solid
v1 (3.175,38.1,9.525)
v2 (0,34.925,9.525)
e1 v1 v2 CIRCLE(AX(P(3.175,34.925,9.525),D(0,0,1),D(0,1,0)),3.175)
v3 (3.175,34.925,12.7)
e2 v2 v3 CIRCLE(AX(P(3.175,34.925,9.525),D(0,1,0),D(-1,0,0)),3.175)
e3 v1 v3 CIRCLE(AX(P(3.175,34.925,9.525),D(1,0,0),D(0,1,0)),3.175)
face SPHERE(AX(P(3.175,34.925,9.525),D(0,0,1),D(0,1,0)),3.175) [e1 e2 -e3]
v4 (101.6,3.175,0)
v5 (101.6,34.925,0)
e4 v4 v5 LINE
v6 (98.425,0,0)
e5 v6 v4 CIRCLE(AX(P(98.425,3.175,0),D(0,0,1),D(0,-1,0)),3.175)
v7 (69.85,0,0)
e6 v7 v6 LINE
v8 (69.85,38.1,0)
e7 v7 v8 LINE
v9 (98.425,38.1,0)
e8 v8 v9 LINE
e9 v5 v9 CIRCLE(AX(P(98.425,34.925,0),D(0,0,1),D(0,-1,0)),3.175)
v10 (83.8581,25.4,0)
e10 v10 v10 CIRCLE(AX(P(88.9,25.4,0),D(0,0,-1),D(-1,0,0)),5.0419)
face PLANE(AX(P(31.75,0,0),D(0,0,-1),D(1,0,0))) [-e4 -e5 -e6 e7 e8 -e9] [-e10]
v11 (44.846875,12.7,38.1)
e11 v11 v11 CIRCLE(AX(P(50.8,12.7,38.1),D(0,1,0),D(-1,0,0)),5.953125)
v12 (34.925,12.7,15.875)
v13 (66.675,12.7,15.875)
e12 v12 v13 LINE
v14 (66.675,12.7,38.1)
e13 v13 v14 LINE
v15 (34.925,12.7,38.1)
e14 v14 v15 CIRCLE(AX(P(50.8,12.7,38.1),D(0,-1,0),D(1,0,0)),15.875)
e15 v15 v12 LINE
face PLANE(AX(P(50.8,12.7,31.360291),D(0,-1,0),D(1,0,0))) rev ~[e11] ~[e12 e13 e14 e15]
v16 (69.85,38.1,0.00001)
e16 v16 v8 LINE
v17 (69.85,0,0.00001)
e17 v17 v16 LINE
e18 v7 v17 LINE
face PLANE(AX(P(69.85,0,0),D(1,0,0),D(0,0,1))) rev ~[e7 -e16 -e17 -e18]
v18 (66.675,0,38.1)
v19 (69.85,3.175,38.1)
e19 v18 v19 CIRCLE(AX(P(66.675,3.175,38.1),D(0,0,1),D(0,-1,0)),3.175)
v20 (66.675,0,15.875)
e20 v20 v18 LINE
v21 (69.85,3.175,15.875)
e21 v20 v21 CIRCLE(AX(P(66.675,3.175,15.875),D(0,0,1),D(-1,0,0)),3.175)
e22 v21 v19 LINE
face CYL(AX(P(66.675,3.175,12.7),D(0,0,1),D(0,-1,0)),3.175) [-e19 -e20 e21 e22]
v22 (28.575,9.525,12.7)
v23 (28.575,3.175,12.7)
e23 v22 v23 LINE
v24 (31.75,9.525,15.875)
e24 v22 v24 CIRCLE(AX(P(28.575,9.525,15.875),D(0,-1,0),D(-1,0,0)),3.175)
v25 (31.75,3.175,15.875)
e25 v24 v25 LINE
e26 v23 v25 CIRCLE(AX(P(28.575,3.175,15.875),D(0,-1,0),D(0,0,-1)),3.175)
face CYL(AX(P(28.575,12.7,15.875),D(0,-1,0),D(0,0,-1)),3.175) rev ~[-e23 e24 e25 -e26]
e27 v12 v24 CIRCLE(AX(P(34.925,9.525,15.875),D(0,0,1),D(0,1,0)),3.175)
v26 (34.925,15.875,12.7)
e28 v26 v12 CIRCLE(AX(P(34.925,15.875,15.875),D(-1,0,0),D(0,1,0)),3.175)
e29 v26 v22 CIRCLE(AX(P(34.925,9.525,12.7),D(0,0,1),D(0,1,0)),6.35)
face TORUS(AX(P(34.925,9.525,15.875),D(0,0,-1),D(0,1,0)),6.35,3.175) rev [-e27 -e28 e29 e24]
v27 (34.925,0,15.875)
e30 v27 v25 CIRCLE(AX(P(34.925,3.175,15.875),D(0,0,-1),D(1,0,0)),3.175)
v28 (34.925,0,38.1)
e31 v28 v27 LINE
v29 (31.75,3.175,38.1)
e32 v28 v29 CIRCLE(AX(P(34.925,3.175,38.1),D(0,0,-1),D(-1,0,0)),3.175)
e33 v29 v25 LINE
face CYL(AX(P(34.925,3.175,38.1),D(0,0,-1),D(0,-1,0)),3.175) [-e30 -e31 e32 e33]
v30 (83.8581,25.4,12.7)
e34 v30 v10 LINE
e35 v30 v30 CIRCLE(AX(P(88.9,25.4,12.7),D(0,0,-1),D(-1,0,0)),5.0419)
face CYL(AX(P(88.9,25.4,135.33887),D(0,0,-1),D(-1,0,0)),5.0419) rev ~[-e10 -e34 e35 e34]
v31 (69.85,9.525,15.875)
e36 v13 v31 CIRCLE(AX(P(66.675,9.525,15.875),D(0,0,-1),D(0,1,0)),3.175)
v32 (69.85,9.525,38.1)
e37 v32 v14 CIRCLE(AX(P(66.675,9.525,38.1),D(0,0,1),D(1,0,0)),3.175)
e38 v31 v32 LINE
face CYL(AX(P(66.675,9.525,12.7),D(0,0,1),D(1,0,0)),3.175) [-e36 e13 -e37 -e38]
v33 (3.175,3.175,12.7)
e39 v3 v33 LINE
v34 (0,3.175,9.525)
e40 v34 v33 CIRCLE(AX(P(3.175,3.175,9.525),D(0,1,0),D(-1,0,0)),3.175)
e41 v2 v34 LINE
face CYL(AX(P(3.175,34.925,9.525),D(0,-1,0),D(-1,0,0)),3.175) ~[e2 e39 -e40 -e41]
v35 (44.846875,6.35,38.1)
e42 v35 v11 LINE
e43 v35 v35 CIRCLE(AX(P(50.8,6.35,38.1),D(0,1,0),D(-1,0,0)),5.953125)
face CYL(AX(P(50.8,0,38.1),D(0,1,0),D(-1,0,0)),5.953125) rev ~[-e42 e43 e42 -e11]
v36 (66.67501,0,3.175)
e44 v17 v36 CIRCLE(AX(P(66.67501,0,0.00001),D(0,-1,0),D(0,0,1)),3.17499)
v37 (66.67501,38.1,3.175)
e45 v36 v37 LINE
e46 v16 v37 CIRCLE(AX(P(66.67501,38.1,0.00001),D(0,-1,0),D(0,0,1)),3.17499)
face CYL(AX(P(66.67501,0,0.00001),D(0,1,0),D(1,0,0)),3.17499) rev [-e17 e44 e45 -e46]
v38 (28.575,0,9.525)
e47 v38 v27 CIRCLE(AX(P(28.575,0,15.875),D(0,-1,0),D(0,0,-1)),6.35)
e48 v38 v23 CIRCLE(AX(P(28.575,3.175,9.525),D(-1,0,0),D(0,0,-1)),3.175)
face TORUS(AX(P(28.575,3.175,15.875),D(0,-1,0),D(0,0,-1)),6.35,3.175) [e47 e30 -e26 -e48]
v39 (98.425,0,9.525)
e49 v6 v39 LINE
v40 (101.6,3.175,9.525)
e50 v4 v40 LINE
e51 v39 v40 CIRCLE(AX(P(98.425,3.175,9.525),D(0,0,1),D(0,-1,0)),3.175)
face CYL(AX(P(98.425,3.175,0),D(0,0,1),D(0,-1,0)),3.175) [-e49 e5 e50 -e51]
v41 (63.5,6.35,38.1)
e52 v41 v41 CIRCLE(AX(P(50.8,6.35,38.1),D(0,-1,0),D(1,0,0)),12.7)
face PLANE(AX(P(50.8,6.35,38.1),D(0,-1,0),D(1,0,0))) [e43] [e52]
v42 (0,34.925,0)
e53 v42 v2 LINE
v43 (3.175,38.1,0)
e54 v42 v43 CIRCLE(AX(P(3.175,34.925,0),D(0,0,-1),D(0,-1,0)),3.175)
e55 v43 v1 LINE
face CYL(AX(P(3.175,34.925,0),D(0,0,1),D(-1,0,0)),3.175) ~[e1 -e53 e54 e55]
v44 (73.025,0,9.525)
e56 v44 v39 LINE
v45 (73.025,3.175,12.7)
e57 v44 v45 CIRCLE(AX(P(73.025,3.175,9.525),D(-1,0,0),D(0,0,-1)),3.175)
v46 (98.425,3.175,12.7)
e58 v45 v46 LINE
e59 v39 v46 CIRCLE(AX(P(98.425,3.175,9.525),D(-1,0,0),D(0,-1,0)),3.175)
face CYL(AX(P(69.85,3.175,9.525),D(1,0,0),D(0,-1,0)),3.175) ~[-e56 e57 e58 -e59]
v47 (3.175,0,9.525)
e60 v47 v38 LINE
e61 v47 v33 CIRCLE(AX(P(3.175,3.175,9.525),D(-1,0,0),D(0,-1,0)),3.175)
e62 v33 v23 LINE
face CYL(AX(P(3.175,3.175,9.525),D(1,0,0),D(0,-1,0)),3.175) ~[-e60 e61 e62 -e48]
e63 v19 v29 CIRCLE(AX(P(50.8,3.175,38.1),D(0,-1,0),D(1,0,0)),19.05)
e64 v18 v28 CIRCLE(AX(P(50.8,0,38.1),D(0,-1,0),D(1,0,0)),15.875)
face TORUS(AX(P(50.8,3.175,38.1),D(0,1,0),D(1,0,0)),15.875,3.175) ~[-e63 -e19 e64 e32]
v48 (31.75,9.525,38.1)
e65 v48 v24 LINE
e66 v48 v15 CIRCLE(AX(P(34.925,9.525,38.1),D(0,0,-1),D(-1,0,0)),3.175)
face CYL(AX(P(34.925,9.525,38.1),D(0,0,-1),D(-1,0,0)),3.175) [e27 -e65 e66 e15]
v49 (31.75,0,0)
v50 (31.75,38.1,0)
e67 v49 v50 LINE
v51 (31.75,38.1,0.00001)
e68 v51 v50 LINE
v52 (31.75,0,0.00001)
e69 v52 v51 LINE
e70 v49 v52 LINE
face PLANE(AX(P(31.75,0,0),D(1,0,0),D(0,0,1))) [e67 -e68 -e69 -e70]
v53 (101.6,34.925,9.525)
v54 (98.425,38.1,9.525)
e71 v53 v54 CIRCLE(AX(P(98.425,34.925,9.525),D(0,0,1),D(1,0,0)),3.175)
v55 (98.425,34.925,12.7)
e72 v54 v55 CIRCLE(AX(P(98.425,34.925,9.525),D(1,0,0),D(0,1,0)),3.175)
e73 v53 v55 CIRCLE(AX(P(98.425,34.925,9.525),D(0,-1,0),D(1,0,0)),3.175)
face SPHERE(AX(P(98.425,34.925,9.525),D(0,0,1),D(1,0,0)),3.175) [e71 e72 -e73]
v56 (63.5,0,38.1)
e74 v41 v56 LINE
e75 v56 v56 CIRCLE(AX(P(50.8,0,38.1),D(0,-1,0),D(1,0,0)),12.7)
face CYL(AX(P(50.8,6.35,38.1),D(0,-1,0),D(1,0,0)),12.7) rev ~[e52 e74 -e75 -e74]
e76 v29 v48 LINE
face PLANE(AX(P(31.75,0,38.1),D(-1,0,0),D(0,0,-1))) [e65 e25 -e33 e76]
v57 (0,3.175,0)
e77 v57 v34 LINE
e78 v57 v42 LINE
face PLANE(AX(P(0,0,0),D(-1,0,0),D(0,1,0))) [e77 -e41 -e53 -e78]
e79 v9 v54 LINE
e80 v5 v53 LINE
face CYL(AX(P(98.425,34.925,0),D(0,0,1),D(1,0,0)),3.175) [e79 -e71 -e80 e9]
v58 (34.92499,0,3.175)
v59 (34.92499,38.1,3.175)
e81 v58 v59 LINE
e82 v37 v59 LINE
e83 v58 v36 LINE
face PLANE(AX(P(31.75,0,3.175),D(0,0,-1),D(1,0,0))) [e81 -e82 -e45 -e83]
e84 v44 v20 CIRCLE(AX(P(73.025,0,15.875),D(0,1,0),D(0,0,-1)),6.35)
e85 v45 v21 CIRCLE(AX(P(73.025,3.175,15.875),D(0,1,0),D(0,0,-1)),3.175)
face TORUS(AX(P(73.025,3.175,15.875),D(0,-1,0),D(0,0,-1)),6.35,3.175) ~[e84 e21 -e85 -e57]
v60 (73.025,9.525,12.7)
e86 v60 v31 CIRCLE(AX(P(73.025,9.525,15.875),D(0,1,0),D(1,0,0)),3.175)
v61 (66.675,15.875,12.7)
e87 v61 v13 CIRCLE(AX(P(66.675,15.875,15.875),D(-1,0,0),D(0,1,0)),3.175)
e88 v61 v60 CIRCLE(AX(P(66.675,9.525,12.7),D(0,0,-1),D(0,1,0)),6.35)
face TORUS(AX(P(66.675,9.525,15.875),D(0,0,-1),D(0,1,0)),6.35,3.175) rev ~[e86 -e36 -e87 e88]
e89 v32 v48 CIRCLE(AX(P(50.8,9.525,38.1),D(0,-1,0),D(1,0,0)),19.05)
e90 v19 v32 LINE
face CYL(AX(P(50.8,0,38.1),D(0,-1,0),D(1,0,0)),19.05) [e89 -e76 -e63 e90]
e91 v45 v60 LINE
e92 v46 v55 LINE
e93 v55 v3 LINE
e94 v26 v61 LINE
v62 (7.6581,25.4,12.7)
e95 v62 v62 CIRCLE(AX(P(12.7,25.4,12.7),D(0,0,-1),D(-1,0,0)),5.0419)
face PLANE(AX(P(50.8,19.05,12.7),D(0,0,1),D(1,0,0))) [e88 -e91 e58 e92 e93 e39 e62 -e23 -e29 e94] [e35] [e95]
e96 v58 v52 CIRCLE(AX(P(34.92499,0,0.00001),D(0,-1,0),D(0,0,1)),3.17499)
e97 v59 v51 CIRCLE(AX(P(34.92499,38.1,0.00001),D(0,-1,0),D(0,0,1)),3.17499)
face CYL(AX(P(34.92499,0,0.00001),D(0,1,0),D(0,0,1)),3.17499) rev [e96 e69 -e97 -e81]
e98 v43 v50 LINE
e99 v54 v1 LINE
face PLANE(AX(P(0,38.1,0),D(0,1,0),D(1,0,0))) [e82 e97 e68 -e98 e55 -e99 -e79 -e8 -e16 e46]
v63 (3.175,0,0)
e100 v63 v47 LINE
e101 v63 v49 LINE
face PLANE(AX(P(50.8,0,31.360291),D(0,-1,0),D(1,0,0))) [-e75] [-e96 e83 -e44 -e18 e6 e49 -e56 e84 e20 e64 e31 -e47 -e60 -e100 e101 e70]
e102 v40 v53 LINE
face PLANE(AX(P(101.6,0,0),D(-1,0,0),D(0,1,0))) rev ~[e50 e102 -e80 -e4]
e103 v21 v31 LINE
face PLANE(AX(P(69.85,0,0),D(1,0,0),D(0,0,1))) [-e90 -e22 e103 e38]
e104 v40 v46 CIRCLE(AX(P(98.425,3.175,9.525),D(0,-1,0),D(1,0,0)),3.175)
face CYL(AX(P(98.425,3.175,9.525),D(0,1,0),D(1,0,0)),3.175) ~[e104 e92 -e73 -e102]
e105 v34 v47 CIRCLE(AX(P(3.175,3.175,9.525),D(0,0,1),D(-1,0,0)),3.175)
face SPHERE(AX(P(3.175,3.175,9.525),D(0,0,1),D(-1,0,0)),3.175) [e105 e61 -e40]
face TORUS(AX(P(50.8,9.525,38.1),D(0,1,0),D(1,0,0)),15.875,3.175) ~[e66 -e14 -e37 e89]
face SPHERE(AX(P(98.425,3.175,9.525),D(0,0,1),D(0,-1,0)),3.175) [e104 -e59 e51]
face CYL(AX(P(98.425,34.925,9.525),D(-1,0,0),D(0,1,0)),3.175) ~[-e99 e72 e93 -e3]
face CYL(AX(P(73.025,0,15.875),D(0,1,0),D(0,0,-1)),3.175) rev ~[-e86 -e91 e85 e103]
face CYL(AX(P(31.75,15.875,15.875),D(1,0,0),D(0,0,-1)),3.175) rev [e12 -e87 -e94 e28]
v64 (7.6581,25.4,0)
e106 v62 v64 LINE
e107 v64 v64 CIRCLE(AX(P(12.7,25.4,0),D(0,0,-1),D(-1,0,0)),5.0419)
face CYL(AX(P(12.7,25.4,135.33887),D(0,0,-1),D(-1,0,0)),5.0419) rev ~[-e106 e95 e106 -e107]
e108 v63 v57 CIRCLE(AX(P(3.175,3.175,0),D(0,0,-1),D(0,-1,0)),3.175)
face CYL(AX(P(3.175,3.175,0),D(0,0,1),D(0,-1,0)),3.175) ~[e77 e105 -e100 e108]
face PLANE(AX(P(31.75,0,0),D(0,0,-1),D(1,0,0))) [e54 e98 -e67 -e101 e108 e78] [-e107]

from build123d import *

# Parameters (mm, degrees)
F0_W           = 101.6
F0_H           = 38.1
F1_DEPTH       = 12.7
F2_W           = 38.1
F2_H           = 12.7
F3_DEPTH       = 12.7
F4_D           = 11.90625
F4_CBORE_D     = 25.4
F4_CBORE_DEPTH = 6.35
F5_W           = 38.1
F5_H           = 3.175
F6_DEPTH       = 38.101
F8_D           = 10.0838
F9_D           = 10.0838
F10_R          = 3.175
F11_R          = 3.175
F12_R          = 3.17499


# Not quite as in the source:
# - a fillet or chamfer is up to 0.001 mm smaller than in the source, because OpenCascade refuses the exact size
# - a length typed as a fraction of an inch, garbled in the dataset ("3 / 203.2 mm" for 3/8 in), is restored


with BuildPart() as f1:
    # F0 (on Top) → F1 (new body)
    with BuildSketch(Plane.XY):
        with Locations((50.8, 19.05)):
            Rectangle(F0_W, F0_H)
    extrude(amount=F1_DEPTH)

    # F2 (on face) → F3 (join)
    with BuildSketch(Plane.XZ):
        with BuildLine():
            Line((31.75, 38.1), (31.75, 12.7))
            Line((31.75, 12.7), (69.85, 12.7))
            Line((69.85, 12.7), (69.85, 38.1))
            ThreePointArc((69.85, 38.1), (50.8, 57.15), (31.75, 38.1))
        make_face()
        with Locations((50.8, 6.35)):
            Rectangle(F2_W, F2_H)
    extrude(amount=-F3_DEPTH)

    # F4 (through all)
    with Locations(Plane.XZ):
        with Locations((50.8, 38.1)):
            CounterBoreHole(F4_D / 2, F4_CBORE_D / 2, F4_CBORE_DEPTH)

    # F5 (on face) → F6 (cut, through all)
    with BuildSketch(Plane.XZ):
        with Locations((50.8, 1.5875)):
            Rectangle(F5_W, F5_H)
    extrude(amount=-F6_DEPTH, mode=Mode.SUBTRACT)

    # F8 (through all)
    with Locations(Plane.XY.offset(12.7)):
        with Locations((12.7, 25.4)):
            Hole(F8_D / 2)

    # F9 (through all)
    with Locations(Plane.XY.offset(12.7)):
        with Locations((88.9, 25.4)):
            Hole(F9_D / 2)

    # F10
    f10_edges = [f1.edges().sort_by_distance(p)[0] for p in [
        (101.6, 0, 6.35),
        (0, 0, 6.35),
        (0, 38.1, 6.35),
        (101.6, 38.1, 6.35),
    ]]
    fillet(f10_edges, radius=F10_R)

    # F11
    f11_edges = [f1.edges().sort_by_distance(p)[0] for p in [
        (69.85, 12.7, 25.4),
        (50.8, 12.7, 57.15),
        (31.75, 12.7, 25.4),
        (50.8, 12.7, 12.7),
        (17.4625, 0, 12.7),
        (50.8, 38.1, 12.7),
        (0, 19.05, 12.7),
        (101.6, 19.05, 12.7),
        (84.1375, 0, 12.7),
        (69.85, 0, 25.4),
        (31.75, 0, 25.4),
        (50.8, 0, 57.15),
        (31.75, 6.35, 12.7),
        (69.85, 6.35, 12.7),
        (0.929936, 37.170064, 12.7),
        (0.929936, 0.929936, 12.7),
        (100.670064, 37.170064, 12.7),
    ]]
    fillet(f11_edges, radius=F11_R)

    # F12 (radius 3.175 in the source; OpenCascade refuses exactly that, so slightly less here)
    f12_edges = [f1.edges().sort_by_distance(p)[0] for p in [
        (31.75, 19.05, 3.175),
        (69.85, 19.05, 3.175),
    ]]
    fillet(f12_edges, radius=F12_R)


solid = f1.part
